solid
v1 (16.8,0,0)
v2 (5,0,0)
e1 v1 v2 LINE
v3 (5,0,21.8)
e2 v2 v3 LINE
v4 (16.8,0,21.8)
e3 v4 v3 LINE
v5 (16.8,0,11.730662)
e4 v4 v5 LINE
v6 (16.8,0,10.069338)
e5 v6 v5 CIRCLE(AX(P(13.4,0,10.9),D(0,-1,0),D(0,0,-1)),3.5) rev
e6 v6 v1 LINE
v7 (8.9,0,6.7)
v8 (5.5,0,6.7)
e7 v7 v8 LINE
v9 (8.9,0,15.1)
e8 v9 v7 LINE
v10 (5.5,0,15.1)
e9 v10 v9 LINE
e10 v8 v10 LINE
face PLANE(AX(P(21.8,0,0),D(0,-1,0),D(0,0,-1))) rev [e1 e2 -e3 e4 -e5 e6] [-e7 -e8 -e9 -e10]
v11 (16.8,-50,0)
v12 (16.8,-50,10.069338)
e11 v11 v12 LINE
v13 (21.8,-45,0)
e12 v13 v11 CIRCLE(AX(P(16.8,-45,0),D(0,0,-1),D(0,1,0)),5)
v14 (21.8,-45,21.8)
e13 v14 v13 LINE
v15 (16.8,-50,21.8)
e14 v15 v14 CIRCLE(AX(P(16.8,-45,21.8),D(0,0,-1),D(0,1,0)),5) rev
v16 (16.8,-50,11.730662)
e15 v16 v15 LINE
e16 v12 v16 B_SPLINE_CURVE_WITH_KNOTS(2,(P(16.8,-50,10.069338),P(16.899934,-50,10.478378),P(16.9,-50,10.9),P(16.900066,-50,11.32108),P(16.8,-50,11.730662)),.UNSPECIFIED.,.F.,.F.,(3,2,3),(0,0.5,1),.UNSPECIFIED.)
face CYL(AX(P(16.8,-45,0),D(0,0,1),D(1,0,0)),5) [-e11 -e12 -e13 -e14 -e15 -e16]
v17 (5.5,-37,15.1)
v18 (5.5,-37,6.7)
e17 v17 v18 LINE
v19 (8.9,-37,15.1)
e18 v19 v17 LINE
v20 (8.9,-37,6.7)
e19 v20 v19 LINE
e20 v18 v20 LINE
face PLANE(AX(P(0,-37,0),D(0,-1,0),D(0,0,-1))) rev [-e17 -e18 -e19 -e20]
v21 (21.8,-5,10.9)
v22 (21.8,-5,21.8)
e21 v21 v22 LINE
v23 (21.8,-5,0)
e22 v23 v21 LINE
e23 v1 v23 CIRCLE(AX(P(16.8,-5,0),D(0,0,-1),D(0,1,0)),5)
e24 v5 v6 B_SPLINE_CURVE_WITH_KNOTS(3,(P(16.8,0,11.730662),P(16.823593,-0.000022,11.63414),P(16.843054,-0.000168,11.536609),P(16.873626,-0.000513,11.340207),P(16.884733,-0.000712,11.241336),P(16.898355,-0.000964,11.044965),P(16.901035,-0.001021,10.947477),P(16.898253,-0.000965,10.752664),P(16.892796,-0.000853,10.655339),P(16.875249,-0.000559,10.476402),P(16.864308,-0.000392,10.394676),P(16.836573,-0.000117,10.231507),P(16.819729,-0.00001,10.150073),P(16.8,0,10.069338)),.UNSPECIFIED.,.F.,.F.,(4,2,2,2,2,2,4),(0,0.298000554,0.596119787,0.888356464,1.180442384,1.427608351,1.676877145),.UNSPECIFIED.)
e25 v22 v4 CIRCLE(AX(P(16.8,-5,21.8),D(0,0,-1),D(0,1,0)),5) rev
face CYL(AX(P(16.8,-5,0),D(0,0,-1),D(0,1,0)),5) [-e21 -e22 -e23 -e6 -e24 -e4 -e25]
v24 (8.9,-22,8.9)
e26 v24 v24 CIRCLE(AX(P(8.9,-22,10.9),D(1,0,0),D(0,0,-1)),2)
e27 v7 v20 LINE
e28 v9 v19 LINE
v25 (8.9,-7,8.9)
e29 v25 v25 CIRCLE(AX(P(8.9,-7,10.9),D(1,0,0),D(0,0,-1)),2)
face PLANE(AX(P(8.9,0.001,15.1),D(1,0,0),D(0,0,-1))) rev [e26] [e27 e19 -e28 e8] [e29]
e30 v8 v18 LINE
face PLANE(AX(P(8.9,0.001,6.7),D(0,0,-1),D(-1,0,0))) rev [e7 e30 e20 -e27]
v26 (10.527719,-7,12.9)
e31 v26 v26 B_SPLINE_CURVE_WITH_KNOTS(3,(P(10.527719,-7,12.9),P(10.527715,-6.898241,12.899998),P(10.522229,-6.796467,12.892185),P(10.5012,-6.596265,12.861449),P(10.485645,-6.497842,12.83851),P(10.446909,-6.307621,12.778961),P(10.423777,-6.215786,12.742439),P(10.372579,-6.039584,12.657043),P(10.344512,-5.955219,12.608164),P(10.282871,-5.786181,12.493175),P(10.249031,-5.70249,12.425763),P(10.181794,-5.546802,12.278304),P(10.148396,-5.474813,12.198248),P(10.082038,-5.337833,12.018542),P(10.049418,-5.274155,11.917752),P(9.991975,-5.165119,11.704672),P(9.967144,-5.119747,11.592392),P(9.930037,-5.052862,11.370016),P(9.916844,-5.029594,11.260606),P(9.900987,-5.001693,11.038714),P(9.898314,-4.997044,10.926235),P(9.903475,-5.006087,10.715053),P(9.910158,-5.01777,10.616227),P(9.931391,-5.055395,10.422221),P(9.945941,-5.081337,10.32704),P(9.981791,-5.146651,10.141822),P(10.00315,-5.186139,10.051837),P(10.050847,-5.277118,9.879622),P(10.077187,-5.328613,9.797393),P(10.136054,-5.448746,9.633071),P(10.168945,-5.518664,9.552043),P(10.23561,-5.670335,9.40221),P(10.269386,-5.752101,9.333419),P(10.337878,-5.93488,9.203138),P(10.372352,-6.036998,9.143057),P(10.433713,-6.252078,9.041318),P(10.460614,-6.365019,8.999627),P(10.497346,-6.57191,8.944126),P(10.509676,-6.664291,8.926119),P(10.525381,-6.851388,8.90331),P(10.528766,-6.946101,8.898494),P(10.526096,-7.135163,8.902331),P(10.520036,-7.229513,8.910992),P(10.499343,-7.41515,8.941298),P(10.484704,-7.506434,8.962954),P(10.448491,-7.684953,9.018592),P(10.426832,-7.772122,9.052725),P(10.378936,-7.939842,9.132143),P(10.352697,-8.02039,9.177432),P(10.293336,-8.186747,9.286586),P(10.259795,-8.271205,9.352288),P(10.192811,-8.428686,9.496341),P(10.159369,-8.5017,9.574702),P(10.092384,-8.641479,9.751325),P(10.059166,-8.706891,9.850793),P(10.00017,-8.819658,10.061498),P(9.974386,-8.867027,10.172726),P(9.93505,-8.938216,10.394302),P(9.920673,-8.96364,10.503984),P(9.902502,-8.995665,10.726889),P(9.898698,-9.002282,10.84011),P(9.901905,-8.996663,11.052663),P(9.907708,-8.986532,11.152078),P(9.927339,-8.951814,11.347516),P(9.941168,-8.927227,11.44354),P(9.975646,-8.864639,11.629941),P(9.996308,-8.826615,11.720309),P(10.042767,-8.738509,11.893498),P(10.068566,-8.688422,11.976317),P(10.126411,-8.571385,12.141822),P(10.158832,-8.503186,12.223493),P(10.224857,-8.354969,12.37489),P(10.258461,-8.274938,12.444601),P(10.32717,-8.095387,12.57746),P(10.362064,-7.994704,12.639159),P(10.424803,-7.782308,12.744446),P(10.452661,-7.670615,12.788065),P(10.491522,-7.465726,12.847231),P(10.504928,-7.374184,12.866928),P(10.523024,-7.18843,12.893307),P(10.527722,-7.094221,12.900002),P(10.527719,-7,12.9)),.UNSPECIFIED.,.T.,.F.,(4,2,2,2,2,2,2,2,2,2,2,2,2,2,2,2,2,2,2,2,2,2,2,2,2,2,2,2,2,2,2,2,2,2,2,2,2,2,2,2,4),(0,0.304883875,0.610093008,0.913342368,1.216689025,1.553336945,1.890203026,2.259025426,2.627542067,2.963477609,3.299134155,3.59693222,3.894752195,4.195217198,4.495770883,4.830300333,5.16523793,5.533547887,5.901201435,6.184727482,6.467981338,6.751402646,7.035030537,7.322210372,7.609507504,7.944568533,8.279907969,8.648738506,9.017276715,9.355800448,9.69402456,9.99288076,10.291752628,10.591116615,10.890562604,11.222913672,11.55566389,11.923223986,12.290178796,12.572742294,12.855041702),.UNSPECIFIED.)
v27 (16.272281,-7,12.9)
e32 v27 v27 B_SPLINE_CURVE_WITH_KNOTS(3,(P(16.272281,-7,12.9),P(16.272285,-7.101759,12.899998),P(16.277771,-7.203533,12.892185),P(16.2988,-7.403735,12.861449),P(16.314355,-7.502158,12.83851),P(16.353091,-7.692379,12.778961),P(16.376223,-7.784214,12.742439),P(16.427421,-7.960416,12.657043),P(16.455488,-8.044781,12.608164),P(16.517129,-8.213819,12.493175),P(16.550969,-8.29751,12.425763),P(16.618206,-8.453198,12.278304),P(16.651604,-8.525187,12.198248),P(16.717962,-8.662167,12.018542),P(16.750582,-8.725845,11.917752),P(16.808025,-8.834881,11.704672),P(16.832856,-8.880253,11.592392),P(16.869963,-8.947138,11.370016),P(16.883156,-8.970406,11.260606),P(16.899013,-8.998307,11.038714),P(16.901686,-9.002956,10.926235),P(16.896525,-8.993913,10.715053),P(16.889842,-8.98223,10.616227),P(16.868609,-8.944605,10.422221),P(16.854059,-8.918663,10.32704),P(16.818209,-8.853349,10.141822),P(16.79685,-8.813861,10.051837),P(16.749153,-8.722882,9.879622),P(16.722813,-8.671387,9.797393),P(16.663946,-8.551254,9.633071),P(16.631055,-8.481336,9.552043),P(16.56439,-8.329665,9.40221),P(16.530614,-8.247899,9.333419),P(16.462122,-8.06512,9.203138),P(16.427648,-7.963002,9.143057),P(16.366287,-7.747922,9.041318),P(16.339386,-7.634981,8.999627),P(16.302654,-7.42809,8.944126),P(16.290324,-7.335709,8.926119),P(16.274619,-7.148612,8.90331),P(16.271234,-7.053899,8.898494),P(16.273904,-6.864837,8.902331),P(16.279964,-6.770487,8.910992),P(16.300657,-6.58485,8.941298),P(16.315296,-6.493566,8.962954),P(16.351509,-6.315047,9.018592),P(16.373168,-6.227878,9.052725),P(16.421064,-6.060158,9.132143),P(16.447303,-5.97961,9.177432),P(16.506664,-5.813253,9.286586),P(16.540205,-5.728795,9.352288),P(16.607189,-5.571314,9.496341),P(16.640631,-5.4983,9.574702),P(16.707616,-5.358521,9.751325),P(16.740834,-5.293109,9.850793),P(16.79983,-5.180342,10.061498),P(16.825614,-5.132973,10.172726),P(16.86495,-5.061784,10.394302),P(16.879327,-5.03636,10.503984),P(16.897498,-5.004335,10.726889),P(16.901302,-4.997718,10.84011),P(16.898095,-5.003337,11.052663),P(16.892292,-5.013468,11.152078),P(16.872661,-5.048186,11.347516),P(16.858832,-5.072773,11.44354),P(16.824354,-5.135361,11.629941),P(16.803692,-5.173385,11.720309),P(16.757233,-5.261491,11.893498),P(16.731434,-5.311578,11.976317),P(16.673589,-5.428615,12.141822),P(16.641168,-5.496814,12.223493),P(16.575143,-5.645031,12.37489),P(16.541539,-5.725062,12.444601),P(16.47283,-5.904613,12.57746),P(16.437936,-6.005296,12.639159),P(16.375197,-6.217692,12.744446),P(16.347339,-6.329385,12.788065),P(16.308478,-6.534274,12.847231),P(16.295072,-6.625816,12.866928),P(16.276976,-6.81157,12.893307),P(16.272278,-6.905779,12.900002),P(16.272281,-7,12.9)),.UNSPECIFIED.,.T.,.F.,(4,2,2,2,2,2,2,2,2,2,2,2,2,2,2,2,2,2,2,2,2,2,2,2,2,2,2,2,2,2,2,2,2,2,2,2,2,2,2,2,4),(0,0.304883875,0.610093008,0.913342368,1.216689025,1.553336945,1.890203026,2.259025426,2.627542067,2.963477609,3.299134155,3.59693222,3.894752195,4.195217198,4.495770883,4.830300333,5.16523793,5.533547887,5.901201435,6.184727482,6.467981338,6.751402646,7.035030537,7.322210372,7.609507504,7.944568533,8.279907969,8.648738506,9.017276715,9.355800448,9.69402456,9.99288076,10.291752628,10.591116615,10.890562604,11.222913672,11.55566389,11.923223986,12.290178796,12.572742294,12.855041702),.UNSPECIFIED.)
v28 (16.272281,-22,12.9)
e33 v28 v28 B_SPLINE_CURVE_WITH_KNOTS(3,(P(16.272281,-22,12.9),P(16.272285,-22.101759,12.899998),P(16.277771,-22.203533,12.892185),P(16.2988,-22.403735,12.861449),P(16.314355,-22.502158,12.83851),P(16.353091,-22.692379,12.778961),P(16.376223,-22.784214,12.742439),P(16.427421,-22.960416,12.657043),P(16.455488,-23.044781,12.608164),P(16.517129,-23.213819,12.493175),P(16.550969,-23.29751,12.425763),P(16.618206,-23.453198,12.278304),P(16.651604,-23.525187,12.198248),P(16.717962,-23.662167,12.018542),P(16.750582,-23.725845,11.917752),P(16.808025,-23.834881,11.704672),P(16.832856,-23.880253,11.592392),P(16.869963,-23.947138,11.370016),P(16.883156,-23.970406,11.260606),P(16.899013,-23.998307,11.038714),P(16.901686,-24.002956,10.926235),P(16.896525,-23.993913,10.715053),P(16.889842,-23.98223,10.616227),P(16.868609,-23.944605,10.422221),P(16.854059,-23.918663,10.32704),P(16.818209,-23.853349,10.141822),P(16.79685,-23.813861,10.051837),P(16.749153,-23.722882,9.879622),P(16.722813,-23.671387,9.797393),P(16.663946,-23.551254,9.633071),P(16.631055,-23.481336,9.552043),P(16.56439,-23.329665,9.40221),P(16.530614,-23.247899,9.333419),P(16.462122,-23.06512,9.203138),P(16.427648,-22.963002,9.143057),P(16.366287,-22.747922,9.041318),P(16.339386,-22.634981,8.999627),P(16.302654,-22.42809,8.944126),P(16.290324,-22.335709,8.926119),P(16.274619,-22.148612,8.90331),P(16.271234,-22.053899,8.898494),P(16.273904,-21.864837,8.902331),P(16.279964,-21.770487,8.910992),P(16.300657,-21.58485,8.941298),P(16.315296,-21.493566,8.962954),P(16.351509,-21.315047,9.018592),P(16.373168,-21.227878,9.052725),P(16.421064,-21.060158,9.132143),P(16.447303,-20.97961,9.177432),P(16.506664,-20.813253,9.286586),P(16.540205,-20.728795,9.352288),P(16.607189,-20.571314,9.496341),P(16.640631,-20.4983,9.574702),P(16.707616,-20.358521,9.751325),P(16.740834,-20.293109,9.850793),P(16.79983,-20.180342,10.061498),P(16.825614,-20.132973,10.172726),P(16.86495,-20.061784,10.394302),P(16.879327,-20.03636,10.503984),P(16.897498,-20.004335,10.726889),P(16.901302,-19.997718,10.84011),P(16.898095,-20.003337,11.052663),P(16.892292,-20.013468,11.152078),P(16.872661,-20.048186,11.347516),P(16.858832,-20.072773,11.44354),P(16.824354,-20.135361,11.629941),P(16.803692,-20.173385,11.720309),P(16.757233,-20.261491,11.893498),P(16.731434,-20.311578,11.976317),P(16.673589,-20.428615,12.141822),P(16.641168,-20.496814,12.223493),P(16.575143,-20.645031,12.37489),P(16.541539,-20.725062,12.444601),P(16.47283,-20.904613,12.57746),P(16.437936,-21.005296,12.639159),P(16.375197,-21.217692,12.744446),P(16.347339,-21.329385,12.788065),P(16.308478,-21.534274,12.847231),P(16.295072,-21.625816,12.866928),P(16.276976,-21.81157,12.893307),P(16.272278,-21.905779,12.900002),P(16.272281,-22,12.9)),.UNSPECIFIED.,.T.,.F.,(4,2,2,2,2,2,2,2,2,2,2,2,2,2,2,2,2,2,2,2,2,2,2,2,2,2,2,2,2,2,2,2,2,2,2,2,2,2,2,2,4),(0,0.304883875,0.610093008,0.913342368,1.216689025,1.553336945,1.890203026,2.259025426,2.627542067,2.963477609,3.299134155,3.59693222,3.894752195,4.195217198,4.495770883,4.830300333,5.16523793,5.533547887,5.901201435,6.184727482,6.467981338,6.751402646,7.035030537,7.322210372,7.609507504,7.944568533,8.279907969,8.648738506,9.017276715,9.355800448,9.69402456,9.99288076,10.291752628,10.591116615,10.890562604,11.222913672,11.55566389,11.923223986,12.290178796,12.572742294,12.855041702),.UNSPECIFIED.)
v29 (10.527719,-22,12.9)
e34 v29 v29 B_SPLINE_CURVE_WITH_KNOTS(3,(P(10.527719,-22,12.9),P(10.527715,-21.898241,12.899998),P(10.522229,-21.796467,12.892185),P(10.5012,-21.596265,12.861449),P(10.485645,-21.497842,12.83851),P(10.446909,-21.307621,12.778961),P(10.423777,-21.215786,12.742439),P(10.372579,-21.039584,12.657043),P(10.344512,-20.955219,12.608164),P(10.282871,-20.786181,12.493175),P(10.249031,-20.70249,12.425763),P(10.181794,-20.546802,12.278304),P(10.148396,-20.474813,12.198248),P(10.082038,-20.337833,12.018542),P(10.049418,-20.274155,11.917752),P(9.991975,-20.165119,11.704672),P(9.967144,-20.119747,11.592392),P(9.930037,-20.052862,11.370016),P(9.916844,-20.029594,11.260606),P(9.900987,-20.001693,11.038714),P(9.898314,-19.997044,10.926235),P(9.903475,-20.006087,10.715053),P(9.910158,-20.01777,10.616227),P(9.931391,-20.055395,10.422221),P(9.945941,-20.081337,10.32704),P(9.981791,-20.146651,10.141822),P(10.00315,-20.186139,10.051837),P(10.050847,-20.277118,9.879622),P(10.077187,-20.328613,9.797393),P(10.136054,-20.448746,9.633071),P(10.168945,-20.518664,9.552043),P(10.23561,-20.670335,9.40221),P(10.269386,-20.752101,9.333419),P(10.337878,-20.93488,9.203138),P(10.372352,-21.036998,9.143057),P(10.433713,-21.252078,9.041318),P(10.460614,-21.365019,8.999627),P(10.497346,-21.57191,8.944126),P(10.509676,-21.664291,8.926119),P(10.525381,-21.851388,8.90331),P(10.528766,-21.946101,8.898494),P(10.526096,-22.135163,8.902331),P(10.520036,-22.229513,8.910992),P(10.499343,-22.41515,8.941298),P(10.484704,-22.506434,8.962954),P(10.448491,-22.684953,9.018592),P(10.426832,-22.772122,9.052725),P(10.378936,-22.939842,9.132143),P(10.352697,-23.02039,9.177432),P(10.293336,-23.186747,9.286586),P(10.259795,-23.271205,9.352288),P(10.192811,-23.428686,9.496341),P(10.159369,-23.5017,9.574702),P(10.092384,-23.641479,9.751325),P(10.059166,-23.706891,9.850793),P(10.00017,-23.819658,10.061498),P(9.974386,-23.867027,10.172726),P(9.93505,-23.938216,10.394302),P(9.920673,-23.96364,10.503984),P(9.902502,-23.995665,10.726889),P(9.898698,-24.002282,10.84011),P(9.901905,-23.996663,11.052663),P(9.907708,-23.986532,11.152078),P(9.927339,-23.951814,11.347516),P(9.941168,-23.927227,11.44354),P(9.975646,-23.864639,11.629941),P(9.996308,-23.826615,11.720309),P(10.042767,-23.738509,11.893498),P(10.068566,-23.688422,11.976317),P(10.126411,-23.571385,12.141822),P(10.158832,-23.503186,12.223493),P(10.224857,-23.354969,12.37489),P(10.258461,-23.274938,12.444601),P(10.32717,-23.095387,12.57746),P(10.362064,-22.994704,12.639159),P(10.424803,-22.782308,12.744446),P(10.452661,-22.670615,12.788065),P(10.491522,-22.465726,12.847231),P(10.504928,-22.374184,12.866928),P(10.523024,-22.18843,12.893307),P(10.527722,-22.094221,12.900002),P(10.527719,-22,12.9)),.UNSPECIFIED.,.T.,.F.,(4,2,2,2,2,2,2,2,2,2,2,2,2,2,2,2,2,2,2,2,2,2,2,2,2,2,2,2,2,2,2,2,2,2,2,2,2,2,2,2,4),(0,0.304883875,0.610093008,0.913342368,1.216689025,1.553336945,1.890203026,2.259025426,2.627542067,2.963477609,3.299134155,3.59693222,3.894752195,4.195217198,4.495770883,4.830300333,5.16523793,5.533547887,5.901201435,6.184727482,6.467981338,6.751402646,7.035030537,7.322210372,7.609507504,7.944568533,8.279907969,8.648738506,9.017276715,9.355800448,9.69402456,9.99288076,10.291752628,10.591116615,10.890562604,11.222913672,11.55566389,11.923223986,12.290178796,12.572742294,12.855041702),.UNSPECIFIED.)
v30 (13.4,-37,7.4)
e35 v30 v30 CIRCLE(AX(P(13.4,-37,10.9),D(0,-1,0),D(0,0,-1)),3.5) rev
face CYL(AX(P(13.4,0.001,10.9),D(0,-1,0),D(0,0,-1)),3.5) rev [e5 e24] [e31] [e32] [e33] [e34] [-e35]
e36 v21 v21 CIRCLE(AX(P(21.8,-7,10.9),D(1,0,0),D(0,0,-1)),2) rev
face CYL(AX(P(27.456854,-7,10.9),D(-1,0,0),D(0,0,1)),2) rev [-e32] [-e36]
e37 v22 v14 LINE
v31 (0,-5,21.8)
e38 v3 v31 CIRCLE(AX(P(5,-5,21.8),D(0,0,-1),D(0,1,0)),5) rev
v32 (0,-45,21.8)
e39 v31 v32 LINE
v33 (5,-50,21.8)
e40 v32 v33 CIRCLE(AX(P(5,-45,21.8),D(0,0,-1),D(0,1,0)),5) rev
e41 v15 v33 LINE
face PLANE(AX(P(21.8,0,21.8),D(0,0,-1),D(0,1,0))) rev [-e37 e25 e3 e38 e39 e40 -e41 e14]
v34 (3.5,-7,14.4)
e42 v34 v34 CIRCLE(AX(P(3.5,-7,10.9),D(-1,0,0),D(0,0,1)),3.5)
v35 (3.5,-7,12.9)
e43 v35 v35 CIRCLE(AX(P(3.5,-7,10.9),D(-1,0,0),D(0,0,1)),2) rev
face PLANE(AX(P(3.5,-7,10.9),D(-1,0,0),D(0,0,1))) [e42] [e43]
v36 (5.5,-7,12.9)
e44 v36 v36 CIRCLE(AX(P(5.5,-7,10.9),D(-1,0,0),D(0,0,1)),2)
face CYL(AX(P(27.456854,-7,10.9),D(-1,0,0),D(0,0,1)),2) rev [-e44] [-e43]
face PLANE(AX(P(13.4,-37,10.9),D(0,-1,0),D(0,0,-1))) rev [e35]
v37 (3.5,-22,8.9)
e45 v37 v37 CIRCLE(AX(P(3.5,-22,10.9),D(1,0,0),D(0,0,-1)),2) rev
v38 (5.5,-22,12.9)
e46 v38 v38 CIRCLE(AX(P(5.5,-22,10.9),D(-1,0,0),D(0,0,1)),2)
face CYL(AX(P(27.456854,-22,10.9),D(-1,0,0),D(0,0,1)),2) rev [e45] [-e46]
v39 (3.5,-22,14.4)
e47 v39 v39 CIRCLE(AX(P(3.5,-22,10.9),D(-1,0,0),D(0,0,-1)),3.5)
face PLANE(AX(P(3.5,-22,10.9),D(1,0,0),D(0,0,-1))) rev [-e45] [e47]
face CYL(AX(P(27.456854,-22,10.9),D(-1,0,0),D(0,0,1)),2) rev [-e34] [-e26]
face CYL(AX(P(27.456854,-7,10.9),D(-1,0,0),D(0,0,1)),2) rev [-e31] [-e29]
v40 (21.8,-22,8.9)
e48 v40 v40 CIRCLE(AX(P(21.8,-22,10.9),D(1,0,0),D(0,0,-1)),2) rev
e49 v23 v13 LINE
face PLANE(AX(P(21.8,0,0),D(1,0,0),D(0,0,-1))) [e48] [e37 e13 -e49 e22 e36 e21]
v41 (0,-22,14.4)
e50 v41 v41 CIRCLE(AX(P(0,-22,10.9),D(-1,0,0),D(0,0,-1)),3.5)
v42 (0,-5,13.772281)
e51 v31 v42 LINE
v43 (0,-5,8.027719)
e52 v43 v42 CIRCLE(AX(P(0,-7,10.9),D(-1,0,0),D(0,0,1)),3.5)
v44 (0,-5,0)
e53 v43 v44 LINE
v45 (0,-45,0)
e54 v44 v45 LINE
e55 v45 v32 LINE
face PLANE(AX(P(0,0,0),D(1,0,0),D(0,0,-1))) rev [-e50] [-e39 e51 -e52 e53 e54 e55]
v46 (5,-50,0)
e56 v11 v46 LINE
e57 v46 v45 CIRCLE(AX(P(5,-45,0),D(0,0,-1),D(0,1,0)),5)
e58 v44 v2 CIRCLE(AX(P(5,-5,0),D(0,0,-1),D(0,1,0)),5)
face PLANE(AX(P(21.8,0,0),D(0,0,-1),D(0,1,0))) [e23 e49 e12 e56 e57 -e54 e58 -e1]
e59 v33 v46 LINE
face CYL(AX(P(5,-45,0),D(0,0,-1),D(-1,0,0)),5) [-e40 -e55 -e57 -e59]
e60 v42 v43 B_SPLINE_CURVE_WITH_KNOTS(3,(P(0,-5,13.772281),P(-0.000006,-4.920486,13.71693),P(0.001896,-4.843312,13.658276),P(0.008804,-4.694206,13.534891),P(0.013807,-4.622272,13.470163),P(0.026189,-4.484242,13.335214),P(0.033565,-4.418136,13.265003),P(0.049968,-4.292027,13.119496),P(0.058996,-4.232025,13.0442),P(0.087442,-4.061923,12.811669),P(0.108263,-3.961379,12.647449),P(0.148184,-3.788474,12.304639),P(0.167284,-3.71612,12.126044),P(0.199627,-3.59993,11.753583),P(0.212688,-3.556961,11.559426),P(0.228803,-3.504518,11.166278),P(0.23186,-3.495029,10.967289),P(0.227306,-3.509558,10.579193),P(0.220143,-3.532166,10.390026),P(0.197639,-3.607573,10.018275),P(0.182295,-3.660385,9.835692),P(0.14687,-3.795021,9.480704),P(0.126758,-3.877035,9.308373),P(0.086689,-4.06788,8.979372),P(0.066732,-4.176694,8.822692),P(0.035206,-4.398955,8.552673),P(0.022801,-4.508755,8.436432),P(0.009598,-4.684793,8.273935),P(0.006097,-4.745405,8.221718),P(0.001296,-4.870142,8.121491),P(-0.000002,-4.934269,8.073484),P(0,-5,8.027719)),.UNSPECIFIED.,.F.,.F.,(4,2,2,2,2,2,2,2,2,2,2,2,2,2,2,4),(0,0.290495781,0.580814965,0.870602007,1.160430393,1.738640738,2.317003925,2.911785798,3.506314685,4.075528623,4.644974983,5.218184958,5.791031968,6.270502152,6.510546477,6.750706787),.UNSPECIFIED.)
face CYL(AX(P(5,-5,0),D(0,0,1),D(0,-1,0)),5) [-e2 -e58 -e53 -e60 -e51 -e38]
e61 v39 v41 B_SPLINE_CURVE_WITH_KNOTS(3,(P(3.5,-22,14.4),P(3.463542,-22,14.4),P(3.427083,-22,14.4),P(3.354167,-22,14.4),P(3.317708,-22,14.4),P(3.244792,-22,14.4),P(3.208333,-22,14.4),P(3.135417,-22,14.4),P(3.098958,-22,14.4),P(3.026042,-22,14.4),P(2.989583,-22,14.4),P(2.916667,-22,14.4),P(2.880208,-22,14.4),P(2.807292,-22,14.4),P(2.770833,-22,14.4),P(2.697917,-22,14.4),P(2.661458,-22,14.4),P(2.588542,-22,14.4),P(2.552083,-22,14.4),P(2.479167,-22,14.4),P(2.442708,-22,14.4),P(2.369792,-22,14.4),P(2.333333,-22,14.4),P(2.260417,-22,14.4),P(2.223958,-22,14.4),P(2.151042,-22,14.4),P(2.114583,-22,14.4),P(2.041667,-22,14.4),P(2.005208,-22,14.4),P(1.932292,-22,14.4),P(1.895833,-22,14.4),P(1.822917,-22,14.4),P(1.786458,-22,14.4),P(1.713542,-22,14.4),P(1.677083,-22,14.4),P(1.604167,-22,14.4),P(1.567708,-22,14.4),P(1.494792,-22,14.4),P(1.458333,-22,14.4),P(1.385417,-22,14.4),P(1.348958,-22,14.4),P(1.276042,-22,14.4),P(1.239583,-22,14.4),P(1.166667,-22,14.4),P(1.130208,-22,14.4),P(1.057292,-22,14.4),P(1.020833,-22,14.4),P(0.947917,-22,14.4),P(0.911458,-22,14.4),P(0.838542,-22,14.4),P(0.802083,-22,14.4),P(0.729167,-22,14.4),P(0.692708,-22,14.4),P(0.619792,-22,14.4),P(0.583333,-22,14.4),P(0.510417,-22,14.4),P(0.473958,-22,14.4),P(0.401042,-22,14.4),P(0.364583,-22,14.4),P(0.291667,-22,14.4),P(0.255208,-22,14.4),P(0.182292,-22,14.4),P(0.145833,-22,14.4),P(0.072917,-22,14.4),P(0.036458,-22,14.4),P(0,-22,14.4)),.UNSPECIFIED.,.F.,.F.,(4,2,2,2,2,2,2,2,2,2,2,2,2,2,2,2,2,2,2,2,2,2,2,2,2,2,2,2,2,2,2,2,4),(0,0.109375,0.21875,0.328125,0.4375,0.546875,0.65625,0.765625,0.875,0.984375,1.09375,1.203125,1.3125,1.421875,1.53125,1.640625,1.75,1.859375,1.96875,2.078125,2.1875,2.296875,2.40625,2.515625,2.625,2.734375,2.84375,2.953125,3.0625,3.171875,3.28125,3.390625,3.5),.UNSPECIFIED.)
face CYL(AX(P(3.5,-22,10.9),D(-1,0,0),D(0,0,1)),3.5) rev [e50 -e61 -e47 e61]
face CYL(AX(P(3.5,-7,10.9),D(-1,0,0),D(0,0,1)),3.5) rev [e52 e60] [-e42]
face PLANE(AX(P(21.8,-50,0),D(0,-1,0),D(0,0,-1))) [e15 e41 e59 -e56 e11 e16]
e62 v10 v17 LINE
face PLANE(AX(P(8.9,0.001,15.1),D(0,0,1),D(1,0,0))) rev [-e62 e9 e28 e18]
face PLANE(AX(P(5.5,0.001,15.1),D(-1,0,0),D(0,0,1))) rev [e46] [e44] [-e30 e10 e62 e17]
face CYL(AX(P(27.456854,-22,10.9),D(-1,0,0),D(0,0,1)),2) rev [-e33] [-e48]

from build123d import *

# Parameters (mm, degrees)
CROQUIS1_W              = 21.8
CROQUIS1_H              = 50
SALIENTE_EXTRUIR1_DEPTH = 21.8
CROQUIS6_R              = 2
CORTAR_EXTRUIR2_DEPTH   = 21.8
CORTAR_EXTRUIR4_REACH   = 60.741
CROQUIS11_R             = 3.5
CROQUIS11_W             = 3.4
CROQUIS11_H             = 8.4
REDONDEO1_R             = 5
CROQUIS13_R             = 3.5
CORTAR_EXTRUIR6_DEPTH   = 3.5
CROQUIS15_W             = 3.4
CROQUIS15_H             = 8.4
SALIENTE_EXTRUIR2_DEPTH = 13


with BuildPart() as part:
    # Croquis1 → Saliente-Extruir1 (new body)
    with BuildSketch(Plane(origin=(0, 0, 0), x_dir=(0, 0, -1), z_dir=(1, 0, 0))):
        with Locations((-10.9, -25)):
            Rectangle(CROQUIS1_W, CROQUIS1_H)
    extrude(amount=SALIENTE_EXTRUIR1_DEPTH)

    # Croquis6 → Cortar-Extruir2 (cut)
    with BuildSketch(Plane.ZY):
        with Locations((10.9, -22)):
            Circle(CROQUIS6_R)
        with Locations((10.9, -7)):
            Circle(CROQUIS6_R)
    extrude(amount=-CORTAR_EXTRUIR2_DEPTH, mode=Mode.SUBTRACT)

    # Croquis11 → Cortar-Extruir4 (cut, up to next)
    with BuildSketch(Plane.XZ.offset(50), mode=Mode.PRIVATE) as cortar_extruir4_sk1:
        with Locations(Location((13.4, 10.9, 0), (0, 0, 270))):
            Circle(CROQUIS11_R)
    cortar_extruir4_tool1 = extrude(cortar_extruir4_sk1.sketch, amount=-CORTAR_EXTRUIR4_REACH, mode=Mode.PRIVATE) & part.part
    # Croquis11 → Cortar-Extruir4 (cut, up to next)
    with BuildSketch(Plane.XZ.offset(50), mode=Mode.PRIVATE) as cortar_extruir4_sk2:
        with Locations((7.2, 10.9)):
            Rectangle(CROQUIS11_W, CROQUIS11_H)
    cortar_extruir4_tool2 = extrude(cortar_extruir4_sk2.sketch, amount=-CORTAR_EXTRUIR4_REACH, mode=Mode.PRIVATE) & part.part
    add(cortar_extruir4_tool1.solids().sort_by_distance((13.4, -50, 10.9))[0], mode=Mode.SUBTRACT)
    add(cortar_extruir4_tool2.solids().sort_by_distance((7.2, -50, 10.9))[0], mode=Mode.SUBTRACT)

    # Redondeo1
    # the kernel refuses this fillet: 5 mm, written as the material it takes off along each edge
    with BuildSketch(Plane(origin=(21.8, -50, 34.3), x_dir=(0, 1, 0), z_dir=(0, 0, -1)), Plane(origin=(0, 0, -12.5), x_dir=(1, 0, 0), z_dir=(0, 0, 1))) as redondeo1_piece_1:
        with BuildLine():
            CenterArc((REDONDEO1_R, -REDONDEO1_R), REDONDEO1_R, 90, 90)
            Line((0, -REDONDEO1_R), (0, 0))
            Line((0, 0), (REDONDEO1_R, 0))
        make_face()
    extrude(amount=46.8, mode=Mode.SUBTRACT)
    with BuildSketch(Plane(origin=(21.8, 0, -12.5), x_dir=(-1, 0, 0), z_dir=(0, 0, 1)), Plane(origin=(0, -50, 34.3), x_dir=(0, 1, 0), z_dir=(0, 0, -1))) as redondeo1_piece_2:
        with BuildLine():
            CenterArc((REDONDEO1_R, REDONDEO1_R), REDONDEO1_R, 180, 90)
            Line((0, REDONDEO1_R), (0, 0))
            Line((0, 0), (REDONDEO1_R, 0))
        make_face()
    extrude(amount=46.8, mode=Mode.SUBTRACT)

    # Croquis13 → Cortar-Extruir6 (cut)
    with BuildSketch(Plane.ZY):
        with Locations((10.9, -7)):
            Circle(CROQUIS13_R)
        with Locations((10.9, -22)):
            Circle(CROQUIS13_R)
    extrude(amount=-CORTAR_EXTRUIR6_DEPTH, mode=Mode.SUBTRACT)

    # Croquis15 → Saliente-Extruir2 (add)
    with BuildSketch(Plane.XZ.offset(50)):
        with Locations((7.2, 10.9)):
            Rectangle(CROQUIS15_W, CROQUIS15_H)
        with BuildLine():
            ThreePointArc((16.8, 10.069337614), (16.9, 10.9), (16.8, 11.730662386))
            ThreePointArc((16.8, 11.730662386), (9.9, 10.9), (16.8, 10.069337614))
        make_face()
    extrude(amount=-SALIENTE_EXTRUIR2_DEPTH)


solid = part.part
